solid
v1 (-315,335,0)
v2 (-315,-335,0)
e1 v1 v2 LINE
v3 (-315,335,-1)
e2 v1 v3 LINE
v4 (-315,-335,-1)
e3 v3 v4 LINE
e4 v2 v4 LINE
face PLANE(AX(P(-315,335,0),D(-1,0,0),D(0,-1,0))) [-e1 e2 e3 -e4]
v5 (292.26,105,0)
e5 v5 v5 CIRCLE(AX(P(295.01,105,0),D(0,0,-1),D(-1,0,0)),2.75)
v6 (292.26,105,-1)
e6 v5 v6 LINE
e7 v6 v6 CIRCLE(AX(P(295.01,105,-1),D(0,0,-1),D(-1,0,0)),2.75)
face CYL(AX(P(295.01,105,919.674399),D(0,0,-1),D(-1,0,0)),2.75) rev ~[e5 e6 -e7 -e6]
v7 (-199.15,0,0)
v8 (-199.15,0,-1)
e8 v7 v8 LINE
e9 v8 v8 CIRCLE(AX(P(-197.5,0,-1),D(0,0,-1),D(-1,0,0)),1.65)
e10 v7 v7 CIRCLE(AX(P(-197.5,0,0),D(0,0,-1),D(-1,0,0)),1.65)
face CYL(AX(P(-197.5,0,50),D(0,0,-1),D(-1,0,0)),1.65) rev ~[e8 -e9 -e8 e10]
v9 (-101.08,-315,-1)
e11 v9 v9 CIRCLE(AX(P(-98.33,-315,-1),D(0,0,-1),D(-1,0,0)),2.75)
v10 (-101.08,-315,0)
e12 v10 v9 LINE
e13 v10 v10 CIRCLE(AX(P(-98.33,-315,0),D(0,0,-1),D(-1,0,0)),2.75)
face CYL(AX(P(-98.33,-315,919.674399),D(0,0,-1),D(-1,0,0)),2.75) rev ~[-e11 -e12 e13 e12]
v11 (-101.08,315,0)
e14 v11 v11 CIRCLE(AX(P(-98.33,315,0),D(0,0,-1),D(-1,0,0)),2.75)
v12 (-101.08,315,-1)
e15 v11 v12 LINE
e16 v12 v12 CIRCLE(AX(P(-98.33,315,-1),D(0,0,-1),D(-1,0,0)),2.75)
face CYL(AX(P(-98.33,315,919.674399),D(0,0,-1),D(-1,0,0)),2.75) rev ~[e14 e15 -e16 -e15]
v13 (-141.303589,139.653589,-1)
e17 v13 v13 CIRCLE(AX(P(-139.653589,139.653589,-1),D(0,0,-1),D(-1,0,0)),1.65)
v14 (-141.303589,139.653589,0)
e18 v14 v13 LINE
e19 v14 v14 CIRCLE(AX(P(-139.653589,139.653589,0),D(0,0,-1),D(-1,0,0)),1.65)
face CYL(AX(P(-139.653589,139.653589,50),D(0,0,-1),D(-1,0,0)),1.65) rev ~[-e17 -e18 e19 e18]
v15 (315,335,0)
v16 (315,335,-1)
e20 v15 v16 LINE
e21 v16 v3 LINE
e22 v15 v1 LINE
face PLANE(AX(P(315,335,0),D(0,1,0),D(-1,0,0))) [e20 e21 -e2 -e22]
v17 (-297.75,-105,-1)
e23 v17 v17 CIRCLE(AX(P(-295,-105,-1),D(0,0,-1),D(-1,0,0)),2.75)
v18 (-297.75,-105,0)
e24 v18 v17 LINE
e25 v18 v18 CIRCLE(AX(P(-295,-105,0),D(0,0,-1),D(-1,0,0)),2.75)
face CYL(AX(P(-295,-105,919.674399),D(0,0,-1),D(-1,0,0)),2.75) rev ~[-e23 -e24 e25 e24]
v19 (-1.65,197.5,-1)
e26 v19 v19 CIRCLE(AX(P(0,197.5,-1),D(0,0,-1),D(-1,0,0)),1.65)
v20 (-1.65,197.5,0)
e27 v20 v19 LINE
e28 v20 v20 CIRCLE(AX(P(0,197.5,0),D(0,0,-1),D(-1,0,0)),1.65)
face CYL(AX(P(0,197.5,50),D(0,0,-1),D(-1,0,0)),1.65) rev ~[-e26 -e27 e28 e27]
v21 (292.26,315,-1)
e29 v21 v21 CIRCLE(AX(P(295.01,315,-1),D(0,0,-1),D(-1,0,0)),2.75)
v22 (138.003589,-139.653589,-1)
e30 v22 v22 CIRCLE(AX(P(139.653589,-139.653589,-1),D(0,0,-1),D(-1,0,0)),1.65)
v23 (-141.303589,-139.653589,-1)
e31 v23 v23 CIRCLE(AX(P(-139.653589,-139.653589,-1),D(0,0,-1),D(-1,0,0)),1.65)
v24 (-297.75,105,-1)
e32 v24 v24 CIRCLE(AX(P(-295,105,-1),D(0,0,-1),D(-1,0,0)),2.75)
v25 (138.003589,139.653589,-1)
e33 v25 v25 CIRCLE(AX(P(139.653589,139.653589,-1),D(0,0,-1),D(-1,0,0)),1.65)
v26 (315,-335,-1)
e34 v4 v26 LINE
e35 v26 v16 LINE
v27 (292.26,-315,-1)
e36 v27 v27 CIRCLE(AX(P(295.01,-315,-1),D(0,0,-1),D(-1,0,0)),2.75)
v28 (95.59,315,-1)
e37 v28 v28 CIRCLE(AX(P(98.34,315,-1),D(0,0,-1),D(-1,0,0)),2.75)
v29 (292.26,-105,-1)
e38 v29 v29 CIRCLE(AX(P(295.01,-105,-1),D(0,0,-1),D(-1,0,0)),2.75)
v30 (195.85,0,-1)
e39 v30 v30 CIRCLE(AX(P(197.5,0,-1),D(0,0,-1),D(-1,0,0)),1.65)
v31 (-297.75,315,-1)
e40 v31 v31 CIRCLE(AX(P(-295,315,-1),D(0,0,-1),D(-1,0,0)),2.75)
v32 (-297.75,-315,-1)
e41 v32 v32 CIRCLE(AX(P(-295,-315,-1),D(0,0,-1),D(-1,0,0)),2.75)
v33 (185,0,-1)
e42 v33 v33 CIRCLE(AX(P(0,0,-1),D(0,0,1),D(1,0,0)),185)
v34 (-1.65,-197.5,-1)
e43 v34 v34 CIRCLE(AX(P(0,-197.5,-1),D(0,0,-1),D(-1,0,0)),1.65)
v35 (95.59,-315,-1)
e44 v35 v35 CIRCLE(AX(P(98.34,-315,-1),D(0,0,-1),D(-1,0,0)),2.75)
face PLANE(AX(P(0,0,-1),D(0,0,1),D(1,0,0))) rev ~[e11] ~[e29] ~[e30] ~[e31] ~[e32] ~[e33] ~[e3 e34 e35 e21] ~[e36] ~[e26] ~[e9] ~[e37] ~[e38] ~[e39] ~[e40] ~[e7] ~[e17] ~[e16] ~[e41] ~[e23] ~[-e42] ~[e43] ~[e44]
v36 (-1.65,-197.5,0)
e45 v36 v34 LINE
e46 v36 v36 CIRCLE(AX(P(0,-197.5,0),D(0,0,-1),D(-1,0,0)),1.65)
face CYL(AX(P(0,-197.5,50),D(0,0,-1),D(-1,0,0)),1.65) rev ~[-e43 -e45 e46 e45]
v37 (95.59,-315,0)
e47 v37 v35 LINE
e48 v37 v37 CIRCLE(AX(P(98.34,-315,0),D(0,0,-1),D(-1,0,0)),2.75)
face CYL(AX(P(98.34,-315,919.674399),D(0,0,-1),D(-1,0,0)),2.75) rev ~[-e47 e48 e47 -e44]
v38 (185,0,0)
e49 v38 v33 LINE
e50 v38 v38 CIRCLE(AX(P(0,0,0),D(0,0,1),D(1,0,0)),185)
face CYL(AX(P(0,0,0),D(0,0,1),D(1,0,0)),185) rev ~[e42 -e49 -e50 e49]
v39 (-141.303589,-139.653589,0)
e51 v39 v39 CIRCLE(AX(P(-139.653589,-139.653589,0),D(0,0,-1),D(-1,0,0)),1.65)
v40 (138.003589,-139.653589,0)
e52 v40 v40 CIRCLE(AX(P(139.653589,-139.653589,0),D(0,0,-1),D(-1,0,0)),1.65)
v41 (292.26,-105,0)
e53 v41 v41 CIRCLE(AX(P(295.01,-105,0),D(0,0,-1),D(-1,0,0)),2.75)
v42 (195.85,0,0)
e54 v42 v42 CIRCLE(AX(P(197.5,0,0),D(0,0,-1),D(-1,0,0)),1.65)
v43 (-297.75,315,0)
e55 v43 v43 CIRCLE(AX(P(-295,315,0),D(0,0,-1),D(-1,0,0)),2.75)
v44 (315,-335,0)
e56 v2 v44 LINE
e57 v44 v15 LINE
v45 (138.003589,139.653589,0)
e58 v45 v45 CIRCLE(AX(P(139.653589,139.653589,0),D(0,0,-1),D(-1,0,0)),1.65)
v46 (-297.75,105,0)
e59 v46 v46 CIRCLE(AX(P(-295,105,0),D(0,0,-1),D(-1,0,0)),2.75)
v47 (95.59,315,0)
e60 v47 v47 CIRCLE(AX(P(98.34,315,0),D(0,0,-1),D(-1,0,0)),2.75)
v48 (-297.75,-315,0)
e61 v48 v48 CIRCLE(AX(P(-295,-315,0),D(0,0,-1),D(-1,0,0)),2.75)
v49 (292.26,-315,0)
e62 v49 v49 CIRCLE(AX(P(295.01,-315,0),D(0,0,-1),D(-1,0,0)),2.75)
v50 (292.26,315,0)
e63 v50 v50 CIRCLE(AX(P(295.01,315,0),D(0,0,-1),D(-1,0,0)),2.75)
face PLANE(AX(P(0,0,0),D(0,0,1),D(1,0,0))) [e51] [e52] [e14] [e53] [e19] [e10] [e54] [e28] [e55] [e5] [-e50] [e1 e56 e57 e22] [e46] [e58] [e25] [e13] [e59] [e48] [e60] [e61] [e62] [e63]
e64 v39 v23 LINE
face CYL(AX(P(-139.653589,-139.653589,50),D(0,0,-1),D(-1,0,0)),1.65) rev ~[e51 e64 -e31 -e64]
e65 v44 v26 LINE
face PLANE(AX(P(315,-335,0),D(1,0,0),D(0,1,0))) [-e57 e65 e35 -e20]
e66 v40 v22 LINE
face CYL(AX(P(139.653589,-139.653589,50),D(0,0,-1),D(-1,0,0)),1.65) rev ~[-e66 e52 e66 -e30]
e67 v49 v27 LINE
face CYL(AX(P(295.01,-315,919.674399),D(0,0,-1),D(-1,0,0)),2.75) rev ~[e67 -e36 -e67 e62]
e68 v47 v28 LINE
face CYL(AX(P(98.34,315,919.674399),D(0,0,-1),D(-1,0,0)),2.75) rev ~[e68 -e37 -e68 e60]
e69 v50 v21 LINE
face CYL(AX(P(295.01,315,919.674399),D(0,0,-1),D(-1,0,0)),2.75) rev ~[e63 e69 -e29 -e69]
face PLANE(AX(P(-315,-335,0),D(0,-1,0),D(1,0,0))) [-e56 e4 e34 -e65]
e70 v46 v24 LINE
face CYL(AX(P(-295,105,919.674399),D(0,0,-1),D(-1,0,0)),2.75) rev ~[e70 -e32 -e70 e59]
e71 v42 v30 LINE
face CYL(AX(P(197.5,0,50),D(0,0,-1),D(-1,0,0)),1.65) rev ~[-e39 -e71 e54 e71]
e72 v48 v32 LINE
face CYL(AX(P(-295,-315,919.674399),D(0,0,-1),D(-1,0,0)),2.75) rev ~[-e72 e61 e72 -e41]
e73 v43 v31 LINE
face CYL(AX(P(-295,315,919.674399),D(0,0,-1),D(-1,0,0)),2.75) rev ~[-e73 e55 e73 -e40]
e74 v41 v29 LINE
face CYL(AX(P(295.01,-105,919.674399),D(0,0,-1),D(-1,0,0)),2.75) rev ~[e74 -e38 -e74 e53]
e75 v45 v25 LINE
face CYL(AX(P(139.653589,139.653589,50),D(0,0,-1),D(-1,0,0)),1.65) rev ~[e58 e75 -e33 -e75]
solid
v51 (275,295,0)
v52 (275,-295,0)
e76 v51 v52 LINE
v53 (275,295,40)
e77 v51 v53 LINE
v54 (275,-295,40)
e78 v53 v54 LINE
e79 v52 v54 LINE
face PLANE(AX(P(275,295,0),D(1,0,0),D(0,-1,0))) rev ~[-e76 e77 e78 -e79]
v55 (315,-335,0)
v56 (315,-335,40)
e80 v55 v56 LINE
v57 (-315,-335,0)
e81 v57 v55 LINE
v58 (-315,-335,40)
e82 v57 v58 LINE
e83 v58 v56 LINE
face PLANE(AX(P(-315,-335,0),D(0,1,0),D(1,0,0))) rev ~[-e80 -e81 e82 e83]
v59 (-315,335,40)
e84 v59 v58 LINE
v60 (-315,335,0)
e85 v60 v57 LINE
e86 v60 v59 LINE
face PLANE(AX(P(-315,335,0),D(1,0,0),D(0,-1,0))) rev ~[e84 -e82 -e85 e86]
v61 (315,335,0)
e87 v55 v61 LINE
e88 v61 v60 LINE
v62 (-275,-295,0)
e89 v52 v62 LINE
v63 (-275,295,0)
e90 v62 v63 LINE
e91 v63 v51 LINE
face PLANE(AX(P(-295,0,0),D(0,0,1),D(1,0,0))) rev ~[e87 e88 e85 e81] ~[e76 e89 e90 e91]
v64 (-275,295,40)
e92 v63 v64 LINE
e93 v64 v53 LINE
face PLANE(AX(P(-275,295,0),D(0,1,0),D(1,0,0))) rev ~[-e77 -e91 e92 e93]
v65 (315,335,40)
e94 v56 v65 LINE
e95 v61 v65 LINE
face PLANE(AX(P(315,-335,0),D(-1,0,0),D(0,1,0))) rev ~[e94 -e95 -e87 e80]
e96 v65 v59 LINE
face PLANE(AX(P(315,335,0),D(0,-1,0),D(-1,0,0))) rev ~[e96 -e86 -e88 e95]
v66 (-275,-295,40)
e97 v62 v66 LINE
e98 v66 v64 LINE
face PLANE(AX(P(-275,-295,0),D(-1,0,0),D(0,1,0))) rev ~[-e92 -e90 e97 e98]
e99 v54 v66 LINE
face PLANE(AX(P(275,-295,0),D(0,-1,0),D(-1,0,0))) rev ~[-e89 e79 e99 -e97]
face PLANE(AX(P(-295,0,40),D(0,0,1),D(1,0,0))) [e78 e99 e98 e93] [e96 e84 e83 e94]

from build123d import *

# Parameters (mm, degrees)
F1_DEPTH = 40
F0_R     = 185
F2_DEPTH = 1
F3_D     = 3.3
F3_DEPTH = 50
F3_TIP   = 0.9914200214
F4_D     = 5.5


# Not quite as in the source:
# - a feature names something its author has since deleted; it is built from what else it names


with BuildPart() as f1:
    # F0 (on Top) → F1 (new body)
    with BuildSketch(Plane.XY):
        Polygon((-275, -295), (-275, 295), (-275, 335), (-315, 335), (-315, -335), (-275, -335), align=None)
        Polygon((-275, 295), (-24.79, 295), (275, 295), (275, 335), (-275, 335), align=None)
        Polygon((275, 335), (275, 295), (275, -295), (275, -325), (275, -335), (315, -335), (315, 335), align=None)
        Polygon((275, -325), (275, -295), (-275, -295), (-275, -335), (0, -335), (275, -335), align=None)
    extrude(amount=F1_DEPTH)


with BuildPart() as f2:
    # F0 (on Top) → F2 (new body)
    with BuildSketch(Plane.XY):
        Polygon((275, 295), (-24.79, 295), (-275, 295), (-275, -295), (275, -295), align=None)
        Circle(F0_R, mode=Mode.SUBTRACT)
        Polygon((-275, 295), (-24.79, 295), (275, 295), (275, 335), (-275, 335), align=None)
        Polygon((275, 335), (275, 295), (275, -295), (275, -325), (275, -335), (315, -335), (315, 335), align=None)
        Polygon((-275, -295), (-275, 295), (-275, 335), (-315, 335), (-315, -335), (-275, -335), align=None)
        Polygon((275, -325), (275, -295), (-275, -295), (-275, -335), (0, -335), (275, -335), align=None)
    extrude(amount=-F2_DEPTH)

    # F3
    with Locations(Plane.XY):
        with Locations((0, 197.5), (139.6535892843, 139.6535892843), (197.5, 0), (139.6535892843, -139.6535892843), (0, -197.5), (-139.6535892843, -139.6535892843), (-139.6535892843, 139.6535892843), (-197.5, 0)):
            Hole(F3_D / 2, depth=F3_DEPTH)
            with Locations((0, 0, -(F3_DEPTH + F3_TIP / 2))):  # 118° drill point
                Cone(0, F3_D / 2, F3_TIP, mode=Mode.SUBTRACT)

    # F4 (through all)
    with Locations(Plane.XY):
        with Locations((295.01, -315), (295.01, -105), (295.01, 105), (295.01, 315), (98.34, 315), (-98.33, 315), (-295, 315), (-295, 105), (-295, -105), (-295, -315), (-98.33, -315), (98.34, -315)):
            Hole(F4_D / 2)


solid = Compound([f1.part, f2.part])
